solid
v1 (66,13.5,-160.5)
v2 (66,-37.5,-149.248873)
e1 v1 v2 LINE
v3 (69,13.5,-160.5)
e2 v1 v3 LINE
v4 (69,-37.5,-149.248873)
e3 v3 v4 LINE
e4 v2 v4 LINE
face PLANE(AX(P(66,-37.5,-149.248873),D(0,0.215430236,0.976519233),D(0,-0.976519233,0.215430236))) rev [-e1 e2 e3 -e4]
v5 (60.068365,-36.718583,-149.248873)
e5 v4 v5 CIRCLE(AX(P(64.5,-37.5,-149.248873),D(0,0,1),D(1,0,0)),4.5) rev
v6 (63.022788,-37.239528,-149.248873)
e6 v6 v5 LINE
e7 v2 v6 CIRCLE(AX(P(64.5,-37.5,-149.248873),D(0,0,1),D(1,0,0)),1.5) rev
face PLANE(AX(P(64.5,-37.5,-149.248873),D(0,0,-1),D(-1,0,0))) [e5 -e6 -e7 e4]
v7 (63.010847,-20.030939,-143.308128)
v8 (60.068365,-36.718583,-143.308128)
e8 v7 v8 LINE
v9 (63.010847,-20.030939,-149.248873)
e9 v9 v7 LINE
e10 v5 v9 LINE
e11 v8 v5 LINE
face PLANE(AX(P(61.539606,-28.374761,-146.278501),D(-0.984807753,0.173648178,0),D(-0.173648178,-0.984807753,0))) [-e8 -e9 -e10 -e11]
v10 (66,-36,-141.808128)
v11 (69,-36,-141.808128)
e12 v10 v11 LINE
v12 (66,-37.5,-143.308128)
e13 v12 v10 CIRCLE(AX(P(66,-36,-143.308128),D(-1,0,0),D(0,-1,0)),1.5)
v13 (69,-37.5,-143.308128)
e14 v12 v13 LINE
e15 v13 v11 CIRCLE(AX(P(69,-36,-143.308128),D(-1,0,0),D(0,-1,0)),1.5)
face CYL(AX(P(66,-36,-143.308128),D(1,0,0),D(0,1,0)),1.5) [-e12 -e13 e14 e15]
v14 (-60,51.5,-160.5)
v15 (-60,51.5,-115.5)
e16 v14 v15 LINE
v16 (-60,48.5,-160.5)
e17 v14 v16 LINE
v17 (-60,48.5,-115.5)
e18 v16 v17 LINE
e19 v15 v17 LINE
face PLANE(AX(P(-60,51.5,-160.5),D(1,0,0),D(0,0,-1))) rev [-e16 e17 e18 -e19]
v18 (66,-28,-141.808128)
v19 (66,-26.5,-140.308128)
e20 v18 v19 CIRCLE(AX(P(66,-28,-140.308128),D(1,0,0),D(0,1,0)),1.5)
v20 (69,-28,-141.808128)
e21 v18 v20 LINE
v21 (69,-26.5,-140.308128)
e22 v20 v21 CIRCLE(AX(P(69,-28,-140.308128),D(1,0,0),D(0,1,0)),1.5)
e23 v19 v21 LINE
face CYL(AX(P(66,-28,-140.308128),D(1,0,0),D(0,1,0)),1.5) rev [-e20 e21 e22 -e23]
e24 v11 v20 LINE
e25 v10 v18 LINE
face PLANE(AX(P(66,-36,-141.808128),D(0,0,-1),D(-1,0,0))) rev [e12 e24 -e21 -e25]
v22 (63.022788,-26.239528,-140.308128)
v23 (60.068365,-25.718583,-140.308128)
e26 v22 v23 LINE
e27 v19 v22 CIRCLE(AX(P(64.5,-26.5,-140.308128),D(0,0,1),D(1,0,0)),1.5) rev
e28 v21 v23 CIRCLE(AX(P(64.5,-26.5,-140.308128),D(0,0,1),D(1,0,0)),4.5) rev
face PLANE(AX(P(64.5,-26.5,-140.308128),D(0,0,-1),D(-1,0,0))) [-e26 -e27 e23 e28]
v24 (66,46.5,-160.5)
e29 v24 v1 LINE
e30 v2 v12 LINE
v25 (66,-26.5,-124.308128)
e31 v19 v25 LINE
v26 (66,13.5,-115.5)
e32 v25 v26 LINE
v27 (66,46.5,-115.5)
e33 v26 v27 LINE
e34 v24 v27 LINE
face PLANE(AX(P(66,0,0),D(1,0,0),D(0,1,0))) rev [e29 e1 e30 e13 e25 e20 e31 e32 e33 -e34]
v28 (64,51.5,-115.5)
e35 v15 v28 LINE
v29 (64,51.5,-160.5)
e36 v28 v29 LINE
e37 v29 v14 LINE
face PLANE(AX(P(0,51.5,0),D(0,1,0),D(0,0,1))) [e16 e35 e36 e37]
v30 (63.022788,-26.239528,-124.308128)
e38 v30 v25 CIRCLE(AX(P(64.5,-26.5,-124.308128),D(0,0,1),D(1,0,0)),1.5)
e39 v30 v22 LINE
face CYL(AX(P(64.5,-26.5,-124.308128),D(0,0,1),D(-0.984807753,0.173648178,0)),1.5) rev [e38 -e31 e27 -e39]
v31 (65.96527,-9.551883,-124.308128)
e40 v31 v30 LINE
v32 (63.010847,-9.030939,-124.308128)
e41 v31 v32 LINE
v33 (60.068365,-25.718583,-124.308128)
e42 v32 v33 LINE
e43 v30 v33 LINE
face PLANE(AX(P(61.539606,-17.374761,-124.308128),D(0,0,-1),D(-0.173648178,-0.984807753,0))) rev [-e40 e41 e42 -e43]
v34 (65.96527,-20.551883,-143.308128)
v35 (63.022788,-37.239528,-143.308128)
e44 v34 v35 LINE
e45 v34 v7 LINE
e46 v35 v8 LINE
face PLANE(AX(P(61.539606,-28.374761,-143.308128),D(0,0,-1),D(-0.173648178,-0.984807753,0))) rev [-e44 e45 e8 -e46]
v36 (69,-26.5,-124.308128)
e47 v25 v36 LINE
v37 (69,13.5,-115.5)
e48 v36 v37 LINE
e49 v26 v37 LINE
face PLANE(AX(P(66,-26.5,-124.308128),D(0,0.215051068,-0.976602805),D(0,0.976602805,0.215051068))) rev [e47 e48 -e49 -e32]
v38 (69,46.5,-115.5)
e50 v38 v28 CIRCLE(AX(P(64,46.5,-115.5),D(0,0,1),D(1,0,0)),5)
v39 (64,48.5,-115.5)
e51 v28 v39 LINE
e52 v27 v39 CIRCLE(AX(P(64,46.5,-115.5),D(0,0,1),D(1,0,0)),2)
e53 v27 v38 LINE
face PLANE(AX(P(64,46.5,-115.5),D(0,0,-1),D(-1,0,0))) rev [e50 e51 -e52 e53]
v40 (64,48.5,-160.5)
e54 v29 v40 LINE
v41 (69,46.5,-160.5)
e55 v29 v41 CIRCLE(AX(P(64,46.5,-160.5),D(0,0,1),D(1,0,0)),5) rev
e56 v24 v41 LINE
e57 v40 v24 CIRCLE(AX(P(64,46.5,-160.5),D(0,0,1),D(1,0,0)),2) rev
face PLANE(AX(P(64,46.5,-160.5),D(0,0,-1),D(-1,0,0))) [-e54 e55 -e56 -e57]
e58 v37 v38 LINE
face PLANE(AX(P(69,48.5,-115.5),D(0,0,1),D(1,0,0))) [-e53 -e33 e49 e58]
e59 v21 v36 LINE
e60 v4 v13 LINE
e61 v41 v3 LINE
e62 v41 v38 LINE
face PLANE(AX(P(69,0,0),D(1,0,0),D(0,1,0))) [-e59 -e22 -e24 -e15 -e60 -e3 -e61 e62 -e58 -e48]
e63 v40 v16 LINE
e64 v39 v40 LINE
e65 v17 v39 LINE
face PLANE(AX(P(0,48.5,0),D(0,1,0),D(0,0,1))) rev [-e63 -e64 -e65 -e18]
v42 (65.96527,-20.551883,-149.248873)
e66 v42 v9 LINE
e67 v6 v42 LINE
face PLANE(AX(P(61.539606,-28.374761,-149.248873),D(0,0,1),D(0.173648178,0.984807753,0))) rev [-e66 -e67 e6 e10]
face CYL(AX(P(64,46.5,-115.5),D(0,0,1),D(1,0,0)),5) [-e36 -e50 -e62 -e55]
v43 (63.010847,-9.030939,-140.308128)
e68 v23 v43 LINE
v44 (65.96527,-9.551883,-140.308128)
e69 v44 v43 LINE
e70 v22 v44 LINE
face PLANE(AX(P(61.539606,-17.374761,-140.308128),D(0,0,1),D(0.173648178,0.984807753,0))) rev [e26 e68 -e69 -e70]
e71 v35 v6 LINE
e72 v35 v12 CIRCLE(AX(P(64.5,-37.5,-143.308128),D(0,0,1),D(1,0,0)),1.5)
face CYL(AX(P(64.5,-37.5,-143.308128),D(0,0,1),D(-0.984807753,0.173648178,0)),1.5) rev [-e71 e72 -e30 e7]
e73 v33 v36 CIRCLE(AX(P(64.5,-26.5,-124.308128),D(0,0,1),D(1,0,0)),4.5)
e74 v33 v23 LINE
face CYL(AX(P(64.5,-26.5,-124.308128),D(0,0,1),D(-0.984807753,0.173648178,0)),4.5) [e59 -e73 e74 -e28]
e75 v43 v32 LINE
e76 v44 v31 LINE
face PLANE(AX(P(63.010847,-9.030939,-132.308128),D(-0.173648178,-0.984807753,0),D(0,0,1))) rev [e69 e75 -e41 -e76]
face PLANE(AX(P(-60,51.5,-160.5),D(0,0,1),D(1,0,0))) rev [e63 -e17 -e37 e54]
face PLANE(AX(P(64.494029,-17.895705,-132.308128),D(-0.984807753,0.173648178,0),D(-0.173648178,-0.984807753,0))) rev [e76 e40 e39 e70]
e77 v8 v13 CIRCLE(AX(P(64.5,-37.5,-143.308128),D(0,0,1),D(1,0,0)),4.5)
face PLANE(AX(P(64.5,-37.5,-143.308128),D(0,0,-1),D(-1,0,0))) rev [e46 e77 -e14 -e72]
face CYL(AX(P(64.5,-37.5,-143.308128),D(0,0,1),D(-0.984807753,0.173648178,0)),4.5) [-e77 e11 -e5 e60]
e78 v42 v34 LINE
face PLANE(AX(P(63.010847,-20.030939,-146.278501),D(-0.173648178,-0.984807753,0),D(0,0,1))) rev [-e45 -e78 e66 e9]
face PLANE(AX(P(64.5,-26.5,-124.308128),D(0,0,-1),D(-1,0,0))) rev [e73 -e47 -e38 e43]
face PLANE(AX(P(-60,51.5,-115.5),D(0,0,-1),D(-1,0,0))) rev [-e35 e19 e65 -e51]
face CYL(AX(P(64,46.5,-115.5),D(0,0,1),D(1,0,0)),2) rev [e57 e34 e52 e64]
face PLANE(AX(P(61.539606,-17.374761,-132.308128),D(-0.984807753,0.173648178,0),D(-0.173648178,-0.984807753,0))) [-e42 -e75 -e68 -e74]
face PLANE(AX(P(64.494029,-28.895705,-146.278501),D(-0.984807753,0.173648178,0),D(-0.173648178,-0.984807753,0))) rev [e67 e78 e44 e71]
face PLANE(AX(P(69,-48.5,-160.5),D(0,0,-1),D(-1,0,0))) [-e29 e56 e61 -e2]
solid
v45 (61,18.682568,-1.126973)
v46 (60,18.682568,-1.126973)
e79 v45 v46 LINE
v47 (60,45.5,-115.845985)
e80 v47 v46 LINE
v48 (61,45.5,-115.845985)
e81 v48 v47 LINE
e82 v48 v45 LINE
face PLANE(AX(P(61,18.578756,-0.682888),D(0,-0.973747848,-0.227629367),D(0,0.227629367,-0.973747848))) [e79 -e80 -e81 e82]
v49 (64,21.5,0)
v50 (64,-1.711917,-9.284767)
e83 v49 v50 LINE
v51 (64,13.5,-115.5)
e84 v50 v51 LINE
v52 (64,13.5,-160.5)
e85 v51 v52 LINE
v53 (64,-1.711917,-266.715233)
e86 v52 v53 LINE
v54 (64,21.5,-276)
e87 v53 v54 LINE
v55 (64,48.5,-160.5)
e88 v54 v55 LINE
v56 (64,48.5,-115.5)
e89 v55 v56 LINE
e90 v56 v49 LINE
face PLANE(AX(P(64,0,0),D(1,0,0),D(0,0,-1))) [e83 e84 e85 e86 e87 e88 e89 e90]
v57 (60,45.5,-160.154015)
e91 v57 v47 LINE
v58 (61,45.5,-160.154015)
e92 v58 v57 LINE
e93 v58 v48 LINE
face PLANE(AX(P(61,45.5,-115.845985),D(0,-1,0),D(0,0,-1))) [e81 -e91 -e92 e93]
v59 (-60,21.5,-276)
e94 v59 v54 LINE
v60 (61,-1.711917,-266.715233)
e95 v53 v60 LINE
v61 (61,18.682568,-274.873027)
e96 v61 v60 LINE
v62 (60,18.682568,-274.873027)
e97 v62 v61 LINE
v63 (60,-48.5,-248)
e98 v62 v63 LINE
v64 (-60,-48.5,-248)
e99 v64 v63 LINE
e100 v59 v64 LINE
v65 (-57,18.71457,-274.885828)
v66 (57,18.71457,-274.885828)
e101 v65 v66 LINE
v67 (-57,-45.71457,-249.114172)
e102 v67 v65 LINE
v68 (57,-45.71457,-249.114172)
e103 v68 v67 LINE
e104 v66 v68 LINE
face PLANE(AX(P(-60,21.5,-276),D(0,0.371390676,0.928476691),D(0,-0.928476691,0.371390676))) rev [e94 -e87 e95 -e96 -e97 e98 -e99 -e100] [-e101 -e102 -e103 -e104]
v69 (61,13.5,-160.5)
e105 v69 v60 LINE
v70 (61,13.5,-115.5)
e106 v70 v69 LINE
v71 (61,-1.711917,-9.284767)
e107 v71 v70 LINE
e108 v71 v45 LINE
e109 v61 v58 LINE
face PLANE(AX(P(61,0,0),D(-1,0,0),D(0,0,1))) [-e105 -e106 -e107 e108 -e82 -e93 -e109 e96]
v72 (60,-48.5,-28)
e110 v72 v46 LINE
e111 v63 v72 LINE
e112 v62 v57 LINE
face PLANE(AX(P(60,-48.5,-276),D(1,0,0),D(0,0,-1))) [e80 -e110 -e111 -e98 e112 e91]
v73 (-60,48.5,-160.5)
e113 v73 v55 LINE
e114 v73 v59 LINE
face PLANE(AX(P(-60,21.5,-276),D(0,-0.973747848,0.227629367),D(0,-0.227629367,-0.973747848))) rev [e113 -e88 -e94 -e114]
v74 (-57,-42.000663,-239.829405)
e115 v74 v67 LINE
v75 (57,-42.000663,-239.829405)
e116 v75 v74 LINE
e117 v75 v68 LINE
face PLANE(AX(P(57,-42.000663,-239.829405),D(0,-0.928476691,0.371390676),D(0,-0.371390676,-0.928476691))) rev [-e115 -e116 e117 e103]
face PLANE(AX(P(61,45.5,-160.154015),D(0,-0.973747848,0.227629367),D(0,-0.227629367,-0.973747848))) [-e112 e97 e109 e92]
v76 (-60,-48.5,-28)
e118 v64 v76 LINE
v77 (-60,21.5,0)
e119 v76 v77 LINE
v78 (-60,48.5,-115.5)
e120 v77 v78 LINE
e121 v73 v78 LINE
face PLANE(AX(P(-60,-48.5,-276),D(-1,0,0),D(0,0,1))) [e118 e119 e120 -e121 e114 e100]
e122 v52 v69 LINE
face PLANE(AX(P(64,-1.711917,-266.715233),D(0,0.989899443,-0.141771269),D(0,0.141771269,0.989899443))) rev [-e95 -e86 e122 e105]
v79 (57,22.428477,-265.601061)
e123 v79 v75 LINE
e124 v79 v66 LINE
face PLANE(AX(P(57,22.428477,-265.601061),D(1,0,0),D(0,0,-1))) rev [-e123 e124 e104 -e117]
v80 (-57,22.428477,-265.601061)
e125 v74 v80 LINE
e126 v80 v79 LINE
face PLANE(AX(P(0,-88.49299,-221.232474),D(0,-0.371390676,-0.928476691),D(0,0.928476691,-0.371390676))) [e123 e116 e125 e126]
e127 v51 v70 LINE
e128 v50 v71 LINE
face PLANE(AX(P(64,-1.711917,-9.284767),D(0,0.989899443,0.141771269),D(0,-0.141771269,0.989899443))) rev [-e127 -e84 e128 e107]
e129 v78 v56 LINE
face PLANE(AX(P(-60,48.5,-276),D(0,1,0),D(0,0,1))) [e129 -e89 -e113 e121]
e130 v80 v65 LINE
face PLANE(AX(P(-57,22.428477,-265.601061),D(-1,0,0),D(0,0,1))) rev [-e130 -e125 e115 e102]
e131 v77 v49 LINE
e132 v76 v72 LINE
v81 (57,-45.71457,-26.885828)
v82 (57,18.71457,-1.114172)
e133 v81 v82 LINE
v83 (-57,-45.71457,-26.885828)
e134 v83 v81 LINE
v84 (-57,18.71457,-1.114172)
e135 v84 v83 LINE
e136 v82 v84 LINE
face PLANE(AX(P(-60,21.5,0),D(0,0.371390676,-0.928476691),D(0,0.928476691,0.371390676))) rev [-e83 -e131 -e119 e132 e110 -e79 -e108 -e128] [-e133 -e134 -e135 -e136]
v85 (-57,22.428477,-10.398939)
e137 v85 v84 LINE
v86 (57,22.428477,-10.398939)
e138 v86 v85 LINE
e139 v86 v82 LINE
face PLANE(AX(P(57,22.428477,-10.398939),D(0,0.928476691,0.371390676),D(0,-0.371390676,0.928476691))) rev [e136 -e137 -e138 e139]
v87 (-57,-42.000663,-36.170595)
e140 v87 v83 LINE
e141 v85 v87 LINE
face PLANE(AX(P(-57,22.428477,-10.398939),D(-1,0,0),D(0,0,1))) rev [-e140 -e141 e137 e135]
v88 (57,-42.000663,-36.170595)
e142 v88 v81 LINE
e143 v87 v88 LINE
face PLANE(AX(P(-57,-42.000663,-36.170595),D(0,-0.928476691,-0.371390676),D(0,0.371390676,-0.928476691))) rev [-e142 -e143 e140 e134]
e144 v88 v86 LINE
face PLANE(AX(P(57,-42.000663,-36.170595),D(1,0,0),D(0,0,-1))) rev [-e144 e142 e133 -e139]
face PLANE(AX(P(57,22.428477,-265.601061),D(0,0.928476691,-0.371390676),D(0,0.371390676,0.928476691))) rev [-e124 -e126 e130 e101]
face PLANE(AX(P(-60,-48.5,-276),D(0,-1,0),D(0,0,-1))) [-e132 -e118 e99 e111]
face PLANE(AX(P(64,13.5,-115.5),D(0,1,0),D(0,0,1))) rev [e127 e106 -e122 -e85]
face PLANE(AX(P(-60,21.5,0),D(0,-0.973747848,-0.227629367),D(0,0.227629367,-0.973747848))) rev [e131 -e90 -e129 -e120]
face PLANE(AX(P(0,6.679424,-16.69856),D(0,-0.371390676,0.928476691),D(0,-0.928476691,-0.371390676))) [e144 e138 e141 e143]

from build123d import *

# Parameters (mm, degrees)
SKETCH1_W           = 120
SKETCH1_H           = 97
BOSS_EXTRUDE1_DEPTH = 276
CUT_EXTRUDE3_DEPTH  = 120
CUT_EXTRUDE4_DEPTH  = 120
SKETCH7_W           = 114
SKETCH7_H           = 69.3923073
CUT_EXTRUDE5_DEPTH  = 10
SKETCH8_W           = 114
SKETCH8_H           = 69.3923073
CUT_EXTRUDE6_DEPTH  = 10
BOSS_EXTRUDE2_DEPTH = 4
CUT_EXTRUDE7_DEPTH  = 1
SKETCH11_W          = 124
SKETCH11_H          = 45
BASE_FLANGE1_DEPTH  = 3
EDGE_FLANGE1_DEPTH  = 45
CUT_EXTRUDE8_DEPTH  = 3
CUT_EXTRUDE9_DEPTH  = 3
HEM1_START          = -140.308128232
HEM1_DEPTH          = 16.000000002
HEM1_START_2        = -149.248872872
HEM1_2_DEPTH        = 5.94074464


# Read off the part's stored shape, not the designer's step: Hem1
# Sheet-metal steps are written as plain solids
with BuildPart() as part:
    # Sketch1 → Boss-Extrude1 (new body)
    with BuildSketch(Plane.XY):
        Rectangle(SKETCH1_W, SKETCH1_H)
    extrude(amount=-BOSS_EXTRUDE1_DEPTH)

    # Sketch4 → Cut-Extrude3 (cut)
    with BuildSketch(Plane(origin=(60, 0, 0), x_dir=(0, 0, -1), z_dir=(1, 0, 0))):
        Polygon((0, 48.5), (115.5, 48.5), (0, 21.5), align=None)
        Polygon((276, 48.5), (276, 21.5), (160.5, 48.5), align=None)
    extrude(amount=-CUT_EXTRUDE3_DEPTH, mode=Mode.SUBTRACT)

    # Sketch6 → Cut-Extrude4 (cut)
    with BuildSketch(Plane(origin=(60, 0, 0), x_dir=(0, 0, -1), z_dir=(1, 0, 0))):
        Polygon((0, -48.5), (0, 21.5), (28, -48.5), align=None)
        Polygon((276, -48.5), (248, -48.5), (276, 21.5), align=None)
    extrude(amount=-CUT_EXTRUDE4_DEPTH, mode=Mode.SUBTRACT)

    # Sketch7 → Cut-Extrude5 (cut)
    with BuildSketch(Plane(origin=(0, 2.965517241, -7.413793103), x_dir=(1, 0, 0), z_dir=(0, -0.37139067635410367, 0.9284766908852594))):
        with Locations((0, -17.733904796)):
            Rectangle(SKETCH7_W, SKETCH7_H)
    extrude(amount=-CUT_EXTRUDE5_DEPTH, mode=Mode.SUBTRACT)

    # Sketch8 → Cut-Extrude6 (cut)
    with BuildSketch(Plane(origin=(0, -92.206896552, -230.517241379), x_dir=(-1, 0, 0), z_dir=(0, -0.37139067635410367, -0.9284766908852594))):
        with Locations((0, 84.769921878)):
            Rectangle(SKETCH8_W, SKETCH8_H)
    extrude(amount=-CUT_EXTRUDE6_DEPTH, mode=Mode.SUBTRACT)

    # Sketch9 → Boss-Extrude2 (add)
    with BuildSketch(Plane(origin=(60, 0, 0), x_dir=(0, 0, -1), z_dir=(1, 0, 0))):
        Polygon((0, 21.5), (115.5, 48.5), (160.5, 48.5), (276, 21.5), (266.715233091, -1.711917272), (160.5, 13.5), (115.5, 13.5), (9.284766909, -1.711917272), align=None)
    extrude(amount=BOSS_EXTRUDE2_DEPTH)

    # Sketch10 → Cut-Extrude7 (cut)
    with BuildSketch(Plane(origin=(60, 0, 0), x_dir=(0, 0, -1), z_dir=(1, 0, 0))):
        Polygon((0.682888101, 18.578756456), (9.284766909, -1.711917272), (115.5, 13.5), (160.5, 13.5), (266.715233091, -1.711917272), (275.317111899, 18.578756456), (160.154014518, 45.5), (115.845985482, 45.5), align=None)
    extrude(amount=CUT_EXTRUDE7_DEPTH, mode=Mode.SUBTRACT)


with BuildPart() as body_2:
    # Sketch11 → Base-Flange1 (new body)
    with BuildSketch(Plane(origin=(0, 48.5, 0), x_dir=(1, 0, 0), z_dir=(0, 1, 0))):
        with Locations((2, 138)):
            Rectangle(SKETCH11_W, SKETCH11_H)
    extrude(amount=BASE_FLANGE1_DEPTH)

    # Edge-Flange1 section (across the edge) → Edge-Flange1 (add)
    with BuildSketch(Plane(origin=(66, 48.5, -160.5), x_dir=(-1, 0, 0), z_dir=(0, 0, 1))):
        with BuildLine():
            Line((-3, 2), (-3, 97))
            Line((-3, 97), (0, 97))
            Line((0, 97), (0, 2))
            ThreePointArc((0, 2), (0.585786438, 0.585786438), (2, 0))
            Line((2, 0), (2, -3))
            ThreePointArc((2, -3), (-1.535533906, -1.535533906), (-3, 2))
        make_face()
    extrude(amount=EDGE_FLANGE1_DEPTH)

    # Sketch19 → Cut-Extrude8 (cut)
    with BuildSketch(Plane(origin=(69, 0, 0), x_dir=(0, 0, -1), z_dir=(1, 0, 0))):
        Polygon((123.398199297, -48.5), (115.5, 13.5), (115.5, -48.5), align=None)
        Polygon((151.398199297, -48.5), (160.5, -48.5), (160.5, 13.5), align=None)
    extrude(amount=-CUT_EXTRUDE8_DEPTH, mode=Mode.SUBTRACT)

    # Sketch20 → Cut-Extrude9 (cut)
    with BuildSketch(Plane(origin=(69, 0, 0), x_dir=(0, 0, -1), z_dir=(1, 0, 0))):
        with BuildLine():
            Line((124.30812823, -26.5), (115.5, 13.5))
            Line((115.5, 13.5), (123.398199297, -48.5))
            Line((123.398199297, -48.5), (151.398199297, -48.5))
            Line((151.398199297, -48.5), (160.5, 13.5))
            Line((160.5, 13.5), (149.248872872, -37.5))
            Line((149.248872872, -37.5), (143.308128232, -37.5))
            ThreePointArc((143.308128232, -37.5), (142.24746806, -37.060660172), (141.808128232, -36))
            Line((141.808128232, -36), (141.808128232, -28))
            ThreePointArc((141.808128232, -28), (141.368788404, -26.939339828), (140.308128232, -26.5))
            Line((140.308128232, -26.5), (124.30812823, -26.5))
        make_face()
    extrude(amount=-CUT_EXTRUDE9_DEPTH, mode=Mode.SUBTRACT)

    # Hem1 outline → Hem1 (add)
    with BuildSketch(Plane.XY.offset(HEM1_START)):
        with BuildLine():
            Line((65.965270364, -9.551883096), (63.010847105, -9.030938563))
            Line((63.010847105, -9.030938563), (60.068365111, -25.7185832))
            ThreePointArc((60.068365111, -25.7185832), (64.107799157, -30.982876141), (69, -26.5))
            Line((69, -26.5), (66, -26.5))
            ThreePointArc((66, -26.5), (64.369266385, -27.994292047), (63.02278837, -26.239527733))
            Line((63.02278837, -26.239527733), (65.965270364, -9.551883096))
        make_face()
    extrude(amount=HEM1_DEPTH)

    # Hem1 2 outline → Hem1 2 (add)
    with BuildSketch(Plane.XY.offset(HEM1_START_2)):
        with BuildLine():
            Line((65.965270364, -20.551883096), (63.010847105, -20.030938563))
            Line((63.010847105, -20.030938563), (60.068365111, -36.7185832))
            ThreePointArc((60.068365111, -36.7185832), (64.107799157, -41.982876141), (69, -37.5))
            Line((69, -37.5), (66, -37.5))
            ThreePointArc((66, -37.5), (64.369266385, -38.994292047), (63.02278837, -37.239527733))
            Line((63.02278837, -37.239527733), (65.965270364, -20.551883096))
        make_face()
    extrude(amount=HEM1_2_DEPTH)


solid = Compound([part.part, body_2.part])
